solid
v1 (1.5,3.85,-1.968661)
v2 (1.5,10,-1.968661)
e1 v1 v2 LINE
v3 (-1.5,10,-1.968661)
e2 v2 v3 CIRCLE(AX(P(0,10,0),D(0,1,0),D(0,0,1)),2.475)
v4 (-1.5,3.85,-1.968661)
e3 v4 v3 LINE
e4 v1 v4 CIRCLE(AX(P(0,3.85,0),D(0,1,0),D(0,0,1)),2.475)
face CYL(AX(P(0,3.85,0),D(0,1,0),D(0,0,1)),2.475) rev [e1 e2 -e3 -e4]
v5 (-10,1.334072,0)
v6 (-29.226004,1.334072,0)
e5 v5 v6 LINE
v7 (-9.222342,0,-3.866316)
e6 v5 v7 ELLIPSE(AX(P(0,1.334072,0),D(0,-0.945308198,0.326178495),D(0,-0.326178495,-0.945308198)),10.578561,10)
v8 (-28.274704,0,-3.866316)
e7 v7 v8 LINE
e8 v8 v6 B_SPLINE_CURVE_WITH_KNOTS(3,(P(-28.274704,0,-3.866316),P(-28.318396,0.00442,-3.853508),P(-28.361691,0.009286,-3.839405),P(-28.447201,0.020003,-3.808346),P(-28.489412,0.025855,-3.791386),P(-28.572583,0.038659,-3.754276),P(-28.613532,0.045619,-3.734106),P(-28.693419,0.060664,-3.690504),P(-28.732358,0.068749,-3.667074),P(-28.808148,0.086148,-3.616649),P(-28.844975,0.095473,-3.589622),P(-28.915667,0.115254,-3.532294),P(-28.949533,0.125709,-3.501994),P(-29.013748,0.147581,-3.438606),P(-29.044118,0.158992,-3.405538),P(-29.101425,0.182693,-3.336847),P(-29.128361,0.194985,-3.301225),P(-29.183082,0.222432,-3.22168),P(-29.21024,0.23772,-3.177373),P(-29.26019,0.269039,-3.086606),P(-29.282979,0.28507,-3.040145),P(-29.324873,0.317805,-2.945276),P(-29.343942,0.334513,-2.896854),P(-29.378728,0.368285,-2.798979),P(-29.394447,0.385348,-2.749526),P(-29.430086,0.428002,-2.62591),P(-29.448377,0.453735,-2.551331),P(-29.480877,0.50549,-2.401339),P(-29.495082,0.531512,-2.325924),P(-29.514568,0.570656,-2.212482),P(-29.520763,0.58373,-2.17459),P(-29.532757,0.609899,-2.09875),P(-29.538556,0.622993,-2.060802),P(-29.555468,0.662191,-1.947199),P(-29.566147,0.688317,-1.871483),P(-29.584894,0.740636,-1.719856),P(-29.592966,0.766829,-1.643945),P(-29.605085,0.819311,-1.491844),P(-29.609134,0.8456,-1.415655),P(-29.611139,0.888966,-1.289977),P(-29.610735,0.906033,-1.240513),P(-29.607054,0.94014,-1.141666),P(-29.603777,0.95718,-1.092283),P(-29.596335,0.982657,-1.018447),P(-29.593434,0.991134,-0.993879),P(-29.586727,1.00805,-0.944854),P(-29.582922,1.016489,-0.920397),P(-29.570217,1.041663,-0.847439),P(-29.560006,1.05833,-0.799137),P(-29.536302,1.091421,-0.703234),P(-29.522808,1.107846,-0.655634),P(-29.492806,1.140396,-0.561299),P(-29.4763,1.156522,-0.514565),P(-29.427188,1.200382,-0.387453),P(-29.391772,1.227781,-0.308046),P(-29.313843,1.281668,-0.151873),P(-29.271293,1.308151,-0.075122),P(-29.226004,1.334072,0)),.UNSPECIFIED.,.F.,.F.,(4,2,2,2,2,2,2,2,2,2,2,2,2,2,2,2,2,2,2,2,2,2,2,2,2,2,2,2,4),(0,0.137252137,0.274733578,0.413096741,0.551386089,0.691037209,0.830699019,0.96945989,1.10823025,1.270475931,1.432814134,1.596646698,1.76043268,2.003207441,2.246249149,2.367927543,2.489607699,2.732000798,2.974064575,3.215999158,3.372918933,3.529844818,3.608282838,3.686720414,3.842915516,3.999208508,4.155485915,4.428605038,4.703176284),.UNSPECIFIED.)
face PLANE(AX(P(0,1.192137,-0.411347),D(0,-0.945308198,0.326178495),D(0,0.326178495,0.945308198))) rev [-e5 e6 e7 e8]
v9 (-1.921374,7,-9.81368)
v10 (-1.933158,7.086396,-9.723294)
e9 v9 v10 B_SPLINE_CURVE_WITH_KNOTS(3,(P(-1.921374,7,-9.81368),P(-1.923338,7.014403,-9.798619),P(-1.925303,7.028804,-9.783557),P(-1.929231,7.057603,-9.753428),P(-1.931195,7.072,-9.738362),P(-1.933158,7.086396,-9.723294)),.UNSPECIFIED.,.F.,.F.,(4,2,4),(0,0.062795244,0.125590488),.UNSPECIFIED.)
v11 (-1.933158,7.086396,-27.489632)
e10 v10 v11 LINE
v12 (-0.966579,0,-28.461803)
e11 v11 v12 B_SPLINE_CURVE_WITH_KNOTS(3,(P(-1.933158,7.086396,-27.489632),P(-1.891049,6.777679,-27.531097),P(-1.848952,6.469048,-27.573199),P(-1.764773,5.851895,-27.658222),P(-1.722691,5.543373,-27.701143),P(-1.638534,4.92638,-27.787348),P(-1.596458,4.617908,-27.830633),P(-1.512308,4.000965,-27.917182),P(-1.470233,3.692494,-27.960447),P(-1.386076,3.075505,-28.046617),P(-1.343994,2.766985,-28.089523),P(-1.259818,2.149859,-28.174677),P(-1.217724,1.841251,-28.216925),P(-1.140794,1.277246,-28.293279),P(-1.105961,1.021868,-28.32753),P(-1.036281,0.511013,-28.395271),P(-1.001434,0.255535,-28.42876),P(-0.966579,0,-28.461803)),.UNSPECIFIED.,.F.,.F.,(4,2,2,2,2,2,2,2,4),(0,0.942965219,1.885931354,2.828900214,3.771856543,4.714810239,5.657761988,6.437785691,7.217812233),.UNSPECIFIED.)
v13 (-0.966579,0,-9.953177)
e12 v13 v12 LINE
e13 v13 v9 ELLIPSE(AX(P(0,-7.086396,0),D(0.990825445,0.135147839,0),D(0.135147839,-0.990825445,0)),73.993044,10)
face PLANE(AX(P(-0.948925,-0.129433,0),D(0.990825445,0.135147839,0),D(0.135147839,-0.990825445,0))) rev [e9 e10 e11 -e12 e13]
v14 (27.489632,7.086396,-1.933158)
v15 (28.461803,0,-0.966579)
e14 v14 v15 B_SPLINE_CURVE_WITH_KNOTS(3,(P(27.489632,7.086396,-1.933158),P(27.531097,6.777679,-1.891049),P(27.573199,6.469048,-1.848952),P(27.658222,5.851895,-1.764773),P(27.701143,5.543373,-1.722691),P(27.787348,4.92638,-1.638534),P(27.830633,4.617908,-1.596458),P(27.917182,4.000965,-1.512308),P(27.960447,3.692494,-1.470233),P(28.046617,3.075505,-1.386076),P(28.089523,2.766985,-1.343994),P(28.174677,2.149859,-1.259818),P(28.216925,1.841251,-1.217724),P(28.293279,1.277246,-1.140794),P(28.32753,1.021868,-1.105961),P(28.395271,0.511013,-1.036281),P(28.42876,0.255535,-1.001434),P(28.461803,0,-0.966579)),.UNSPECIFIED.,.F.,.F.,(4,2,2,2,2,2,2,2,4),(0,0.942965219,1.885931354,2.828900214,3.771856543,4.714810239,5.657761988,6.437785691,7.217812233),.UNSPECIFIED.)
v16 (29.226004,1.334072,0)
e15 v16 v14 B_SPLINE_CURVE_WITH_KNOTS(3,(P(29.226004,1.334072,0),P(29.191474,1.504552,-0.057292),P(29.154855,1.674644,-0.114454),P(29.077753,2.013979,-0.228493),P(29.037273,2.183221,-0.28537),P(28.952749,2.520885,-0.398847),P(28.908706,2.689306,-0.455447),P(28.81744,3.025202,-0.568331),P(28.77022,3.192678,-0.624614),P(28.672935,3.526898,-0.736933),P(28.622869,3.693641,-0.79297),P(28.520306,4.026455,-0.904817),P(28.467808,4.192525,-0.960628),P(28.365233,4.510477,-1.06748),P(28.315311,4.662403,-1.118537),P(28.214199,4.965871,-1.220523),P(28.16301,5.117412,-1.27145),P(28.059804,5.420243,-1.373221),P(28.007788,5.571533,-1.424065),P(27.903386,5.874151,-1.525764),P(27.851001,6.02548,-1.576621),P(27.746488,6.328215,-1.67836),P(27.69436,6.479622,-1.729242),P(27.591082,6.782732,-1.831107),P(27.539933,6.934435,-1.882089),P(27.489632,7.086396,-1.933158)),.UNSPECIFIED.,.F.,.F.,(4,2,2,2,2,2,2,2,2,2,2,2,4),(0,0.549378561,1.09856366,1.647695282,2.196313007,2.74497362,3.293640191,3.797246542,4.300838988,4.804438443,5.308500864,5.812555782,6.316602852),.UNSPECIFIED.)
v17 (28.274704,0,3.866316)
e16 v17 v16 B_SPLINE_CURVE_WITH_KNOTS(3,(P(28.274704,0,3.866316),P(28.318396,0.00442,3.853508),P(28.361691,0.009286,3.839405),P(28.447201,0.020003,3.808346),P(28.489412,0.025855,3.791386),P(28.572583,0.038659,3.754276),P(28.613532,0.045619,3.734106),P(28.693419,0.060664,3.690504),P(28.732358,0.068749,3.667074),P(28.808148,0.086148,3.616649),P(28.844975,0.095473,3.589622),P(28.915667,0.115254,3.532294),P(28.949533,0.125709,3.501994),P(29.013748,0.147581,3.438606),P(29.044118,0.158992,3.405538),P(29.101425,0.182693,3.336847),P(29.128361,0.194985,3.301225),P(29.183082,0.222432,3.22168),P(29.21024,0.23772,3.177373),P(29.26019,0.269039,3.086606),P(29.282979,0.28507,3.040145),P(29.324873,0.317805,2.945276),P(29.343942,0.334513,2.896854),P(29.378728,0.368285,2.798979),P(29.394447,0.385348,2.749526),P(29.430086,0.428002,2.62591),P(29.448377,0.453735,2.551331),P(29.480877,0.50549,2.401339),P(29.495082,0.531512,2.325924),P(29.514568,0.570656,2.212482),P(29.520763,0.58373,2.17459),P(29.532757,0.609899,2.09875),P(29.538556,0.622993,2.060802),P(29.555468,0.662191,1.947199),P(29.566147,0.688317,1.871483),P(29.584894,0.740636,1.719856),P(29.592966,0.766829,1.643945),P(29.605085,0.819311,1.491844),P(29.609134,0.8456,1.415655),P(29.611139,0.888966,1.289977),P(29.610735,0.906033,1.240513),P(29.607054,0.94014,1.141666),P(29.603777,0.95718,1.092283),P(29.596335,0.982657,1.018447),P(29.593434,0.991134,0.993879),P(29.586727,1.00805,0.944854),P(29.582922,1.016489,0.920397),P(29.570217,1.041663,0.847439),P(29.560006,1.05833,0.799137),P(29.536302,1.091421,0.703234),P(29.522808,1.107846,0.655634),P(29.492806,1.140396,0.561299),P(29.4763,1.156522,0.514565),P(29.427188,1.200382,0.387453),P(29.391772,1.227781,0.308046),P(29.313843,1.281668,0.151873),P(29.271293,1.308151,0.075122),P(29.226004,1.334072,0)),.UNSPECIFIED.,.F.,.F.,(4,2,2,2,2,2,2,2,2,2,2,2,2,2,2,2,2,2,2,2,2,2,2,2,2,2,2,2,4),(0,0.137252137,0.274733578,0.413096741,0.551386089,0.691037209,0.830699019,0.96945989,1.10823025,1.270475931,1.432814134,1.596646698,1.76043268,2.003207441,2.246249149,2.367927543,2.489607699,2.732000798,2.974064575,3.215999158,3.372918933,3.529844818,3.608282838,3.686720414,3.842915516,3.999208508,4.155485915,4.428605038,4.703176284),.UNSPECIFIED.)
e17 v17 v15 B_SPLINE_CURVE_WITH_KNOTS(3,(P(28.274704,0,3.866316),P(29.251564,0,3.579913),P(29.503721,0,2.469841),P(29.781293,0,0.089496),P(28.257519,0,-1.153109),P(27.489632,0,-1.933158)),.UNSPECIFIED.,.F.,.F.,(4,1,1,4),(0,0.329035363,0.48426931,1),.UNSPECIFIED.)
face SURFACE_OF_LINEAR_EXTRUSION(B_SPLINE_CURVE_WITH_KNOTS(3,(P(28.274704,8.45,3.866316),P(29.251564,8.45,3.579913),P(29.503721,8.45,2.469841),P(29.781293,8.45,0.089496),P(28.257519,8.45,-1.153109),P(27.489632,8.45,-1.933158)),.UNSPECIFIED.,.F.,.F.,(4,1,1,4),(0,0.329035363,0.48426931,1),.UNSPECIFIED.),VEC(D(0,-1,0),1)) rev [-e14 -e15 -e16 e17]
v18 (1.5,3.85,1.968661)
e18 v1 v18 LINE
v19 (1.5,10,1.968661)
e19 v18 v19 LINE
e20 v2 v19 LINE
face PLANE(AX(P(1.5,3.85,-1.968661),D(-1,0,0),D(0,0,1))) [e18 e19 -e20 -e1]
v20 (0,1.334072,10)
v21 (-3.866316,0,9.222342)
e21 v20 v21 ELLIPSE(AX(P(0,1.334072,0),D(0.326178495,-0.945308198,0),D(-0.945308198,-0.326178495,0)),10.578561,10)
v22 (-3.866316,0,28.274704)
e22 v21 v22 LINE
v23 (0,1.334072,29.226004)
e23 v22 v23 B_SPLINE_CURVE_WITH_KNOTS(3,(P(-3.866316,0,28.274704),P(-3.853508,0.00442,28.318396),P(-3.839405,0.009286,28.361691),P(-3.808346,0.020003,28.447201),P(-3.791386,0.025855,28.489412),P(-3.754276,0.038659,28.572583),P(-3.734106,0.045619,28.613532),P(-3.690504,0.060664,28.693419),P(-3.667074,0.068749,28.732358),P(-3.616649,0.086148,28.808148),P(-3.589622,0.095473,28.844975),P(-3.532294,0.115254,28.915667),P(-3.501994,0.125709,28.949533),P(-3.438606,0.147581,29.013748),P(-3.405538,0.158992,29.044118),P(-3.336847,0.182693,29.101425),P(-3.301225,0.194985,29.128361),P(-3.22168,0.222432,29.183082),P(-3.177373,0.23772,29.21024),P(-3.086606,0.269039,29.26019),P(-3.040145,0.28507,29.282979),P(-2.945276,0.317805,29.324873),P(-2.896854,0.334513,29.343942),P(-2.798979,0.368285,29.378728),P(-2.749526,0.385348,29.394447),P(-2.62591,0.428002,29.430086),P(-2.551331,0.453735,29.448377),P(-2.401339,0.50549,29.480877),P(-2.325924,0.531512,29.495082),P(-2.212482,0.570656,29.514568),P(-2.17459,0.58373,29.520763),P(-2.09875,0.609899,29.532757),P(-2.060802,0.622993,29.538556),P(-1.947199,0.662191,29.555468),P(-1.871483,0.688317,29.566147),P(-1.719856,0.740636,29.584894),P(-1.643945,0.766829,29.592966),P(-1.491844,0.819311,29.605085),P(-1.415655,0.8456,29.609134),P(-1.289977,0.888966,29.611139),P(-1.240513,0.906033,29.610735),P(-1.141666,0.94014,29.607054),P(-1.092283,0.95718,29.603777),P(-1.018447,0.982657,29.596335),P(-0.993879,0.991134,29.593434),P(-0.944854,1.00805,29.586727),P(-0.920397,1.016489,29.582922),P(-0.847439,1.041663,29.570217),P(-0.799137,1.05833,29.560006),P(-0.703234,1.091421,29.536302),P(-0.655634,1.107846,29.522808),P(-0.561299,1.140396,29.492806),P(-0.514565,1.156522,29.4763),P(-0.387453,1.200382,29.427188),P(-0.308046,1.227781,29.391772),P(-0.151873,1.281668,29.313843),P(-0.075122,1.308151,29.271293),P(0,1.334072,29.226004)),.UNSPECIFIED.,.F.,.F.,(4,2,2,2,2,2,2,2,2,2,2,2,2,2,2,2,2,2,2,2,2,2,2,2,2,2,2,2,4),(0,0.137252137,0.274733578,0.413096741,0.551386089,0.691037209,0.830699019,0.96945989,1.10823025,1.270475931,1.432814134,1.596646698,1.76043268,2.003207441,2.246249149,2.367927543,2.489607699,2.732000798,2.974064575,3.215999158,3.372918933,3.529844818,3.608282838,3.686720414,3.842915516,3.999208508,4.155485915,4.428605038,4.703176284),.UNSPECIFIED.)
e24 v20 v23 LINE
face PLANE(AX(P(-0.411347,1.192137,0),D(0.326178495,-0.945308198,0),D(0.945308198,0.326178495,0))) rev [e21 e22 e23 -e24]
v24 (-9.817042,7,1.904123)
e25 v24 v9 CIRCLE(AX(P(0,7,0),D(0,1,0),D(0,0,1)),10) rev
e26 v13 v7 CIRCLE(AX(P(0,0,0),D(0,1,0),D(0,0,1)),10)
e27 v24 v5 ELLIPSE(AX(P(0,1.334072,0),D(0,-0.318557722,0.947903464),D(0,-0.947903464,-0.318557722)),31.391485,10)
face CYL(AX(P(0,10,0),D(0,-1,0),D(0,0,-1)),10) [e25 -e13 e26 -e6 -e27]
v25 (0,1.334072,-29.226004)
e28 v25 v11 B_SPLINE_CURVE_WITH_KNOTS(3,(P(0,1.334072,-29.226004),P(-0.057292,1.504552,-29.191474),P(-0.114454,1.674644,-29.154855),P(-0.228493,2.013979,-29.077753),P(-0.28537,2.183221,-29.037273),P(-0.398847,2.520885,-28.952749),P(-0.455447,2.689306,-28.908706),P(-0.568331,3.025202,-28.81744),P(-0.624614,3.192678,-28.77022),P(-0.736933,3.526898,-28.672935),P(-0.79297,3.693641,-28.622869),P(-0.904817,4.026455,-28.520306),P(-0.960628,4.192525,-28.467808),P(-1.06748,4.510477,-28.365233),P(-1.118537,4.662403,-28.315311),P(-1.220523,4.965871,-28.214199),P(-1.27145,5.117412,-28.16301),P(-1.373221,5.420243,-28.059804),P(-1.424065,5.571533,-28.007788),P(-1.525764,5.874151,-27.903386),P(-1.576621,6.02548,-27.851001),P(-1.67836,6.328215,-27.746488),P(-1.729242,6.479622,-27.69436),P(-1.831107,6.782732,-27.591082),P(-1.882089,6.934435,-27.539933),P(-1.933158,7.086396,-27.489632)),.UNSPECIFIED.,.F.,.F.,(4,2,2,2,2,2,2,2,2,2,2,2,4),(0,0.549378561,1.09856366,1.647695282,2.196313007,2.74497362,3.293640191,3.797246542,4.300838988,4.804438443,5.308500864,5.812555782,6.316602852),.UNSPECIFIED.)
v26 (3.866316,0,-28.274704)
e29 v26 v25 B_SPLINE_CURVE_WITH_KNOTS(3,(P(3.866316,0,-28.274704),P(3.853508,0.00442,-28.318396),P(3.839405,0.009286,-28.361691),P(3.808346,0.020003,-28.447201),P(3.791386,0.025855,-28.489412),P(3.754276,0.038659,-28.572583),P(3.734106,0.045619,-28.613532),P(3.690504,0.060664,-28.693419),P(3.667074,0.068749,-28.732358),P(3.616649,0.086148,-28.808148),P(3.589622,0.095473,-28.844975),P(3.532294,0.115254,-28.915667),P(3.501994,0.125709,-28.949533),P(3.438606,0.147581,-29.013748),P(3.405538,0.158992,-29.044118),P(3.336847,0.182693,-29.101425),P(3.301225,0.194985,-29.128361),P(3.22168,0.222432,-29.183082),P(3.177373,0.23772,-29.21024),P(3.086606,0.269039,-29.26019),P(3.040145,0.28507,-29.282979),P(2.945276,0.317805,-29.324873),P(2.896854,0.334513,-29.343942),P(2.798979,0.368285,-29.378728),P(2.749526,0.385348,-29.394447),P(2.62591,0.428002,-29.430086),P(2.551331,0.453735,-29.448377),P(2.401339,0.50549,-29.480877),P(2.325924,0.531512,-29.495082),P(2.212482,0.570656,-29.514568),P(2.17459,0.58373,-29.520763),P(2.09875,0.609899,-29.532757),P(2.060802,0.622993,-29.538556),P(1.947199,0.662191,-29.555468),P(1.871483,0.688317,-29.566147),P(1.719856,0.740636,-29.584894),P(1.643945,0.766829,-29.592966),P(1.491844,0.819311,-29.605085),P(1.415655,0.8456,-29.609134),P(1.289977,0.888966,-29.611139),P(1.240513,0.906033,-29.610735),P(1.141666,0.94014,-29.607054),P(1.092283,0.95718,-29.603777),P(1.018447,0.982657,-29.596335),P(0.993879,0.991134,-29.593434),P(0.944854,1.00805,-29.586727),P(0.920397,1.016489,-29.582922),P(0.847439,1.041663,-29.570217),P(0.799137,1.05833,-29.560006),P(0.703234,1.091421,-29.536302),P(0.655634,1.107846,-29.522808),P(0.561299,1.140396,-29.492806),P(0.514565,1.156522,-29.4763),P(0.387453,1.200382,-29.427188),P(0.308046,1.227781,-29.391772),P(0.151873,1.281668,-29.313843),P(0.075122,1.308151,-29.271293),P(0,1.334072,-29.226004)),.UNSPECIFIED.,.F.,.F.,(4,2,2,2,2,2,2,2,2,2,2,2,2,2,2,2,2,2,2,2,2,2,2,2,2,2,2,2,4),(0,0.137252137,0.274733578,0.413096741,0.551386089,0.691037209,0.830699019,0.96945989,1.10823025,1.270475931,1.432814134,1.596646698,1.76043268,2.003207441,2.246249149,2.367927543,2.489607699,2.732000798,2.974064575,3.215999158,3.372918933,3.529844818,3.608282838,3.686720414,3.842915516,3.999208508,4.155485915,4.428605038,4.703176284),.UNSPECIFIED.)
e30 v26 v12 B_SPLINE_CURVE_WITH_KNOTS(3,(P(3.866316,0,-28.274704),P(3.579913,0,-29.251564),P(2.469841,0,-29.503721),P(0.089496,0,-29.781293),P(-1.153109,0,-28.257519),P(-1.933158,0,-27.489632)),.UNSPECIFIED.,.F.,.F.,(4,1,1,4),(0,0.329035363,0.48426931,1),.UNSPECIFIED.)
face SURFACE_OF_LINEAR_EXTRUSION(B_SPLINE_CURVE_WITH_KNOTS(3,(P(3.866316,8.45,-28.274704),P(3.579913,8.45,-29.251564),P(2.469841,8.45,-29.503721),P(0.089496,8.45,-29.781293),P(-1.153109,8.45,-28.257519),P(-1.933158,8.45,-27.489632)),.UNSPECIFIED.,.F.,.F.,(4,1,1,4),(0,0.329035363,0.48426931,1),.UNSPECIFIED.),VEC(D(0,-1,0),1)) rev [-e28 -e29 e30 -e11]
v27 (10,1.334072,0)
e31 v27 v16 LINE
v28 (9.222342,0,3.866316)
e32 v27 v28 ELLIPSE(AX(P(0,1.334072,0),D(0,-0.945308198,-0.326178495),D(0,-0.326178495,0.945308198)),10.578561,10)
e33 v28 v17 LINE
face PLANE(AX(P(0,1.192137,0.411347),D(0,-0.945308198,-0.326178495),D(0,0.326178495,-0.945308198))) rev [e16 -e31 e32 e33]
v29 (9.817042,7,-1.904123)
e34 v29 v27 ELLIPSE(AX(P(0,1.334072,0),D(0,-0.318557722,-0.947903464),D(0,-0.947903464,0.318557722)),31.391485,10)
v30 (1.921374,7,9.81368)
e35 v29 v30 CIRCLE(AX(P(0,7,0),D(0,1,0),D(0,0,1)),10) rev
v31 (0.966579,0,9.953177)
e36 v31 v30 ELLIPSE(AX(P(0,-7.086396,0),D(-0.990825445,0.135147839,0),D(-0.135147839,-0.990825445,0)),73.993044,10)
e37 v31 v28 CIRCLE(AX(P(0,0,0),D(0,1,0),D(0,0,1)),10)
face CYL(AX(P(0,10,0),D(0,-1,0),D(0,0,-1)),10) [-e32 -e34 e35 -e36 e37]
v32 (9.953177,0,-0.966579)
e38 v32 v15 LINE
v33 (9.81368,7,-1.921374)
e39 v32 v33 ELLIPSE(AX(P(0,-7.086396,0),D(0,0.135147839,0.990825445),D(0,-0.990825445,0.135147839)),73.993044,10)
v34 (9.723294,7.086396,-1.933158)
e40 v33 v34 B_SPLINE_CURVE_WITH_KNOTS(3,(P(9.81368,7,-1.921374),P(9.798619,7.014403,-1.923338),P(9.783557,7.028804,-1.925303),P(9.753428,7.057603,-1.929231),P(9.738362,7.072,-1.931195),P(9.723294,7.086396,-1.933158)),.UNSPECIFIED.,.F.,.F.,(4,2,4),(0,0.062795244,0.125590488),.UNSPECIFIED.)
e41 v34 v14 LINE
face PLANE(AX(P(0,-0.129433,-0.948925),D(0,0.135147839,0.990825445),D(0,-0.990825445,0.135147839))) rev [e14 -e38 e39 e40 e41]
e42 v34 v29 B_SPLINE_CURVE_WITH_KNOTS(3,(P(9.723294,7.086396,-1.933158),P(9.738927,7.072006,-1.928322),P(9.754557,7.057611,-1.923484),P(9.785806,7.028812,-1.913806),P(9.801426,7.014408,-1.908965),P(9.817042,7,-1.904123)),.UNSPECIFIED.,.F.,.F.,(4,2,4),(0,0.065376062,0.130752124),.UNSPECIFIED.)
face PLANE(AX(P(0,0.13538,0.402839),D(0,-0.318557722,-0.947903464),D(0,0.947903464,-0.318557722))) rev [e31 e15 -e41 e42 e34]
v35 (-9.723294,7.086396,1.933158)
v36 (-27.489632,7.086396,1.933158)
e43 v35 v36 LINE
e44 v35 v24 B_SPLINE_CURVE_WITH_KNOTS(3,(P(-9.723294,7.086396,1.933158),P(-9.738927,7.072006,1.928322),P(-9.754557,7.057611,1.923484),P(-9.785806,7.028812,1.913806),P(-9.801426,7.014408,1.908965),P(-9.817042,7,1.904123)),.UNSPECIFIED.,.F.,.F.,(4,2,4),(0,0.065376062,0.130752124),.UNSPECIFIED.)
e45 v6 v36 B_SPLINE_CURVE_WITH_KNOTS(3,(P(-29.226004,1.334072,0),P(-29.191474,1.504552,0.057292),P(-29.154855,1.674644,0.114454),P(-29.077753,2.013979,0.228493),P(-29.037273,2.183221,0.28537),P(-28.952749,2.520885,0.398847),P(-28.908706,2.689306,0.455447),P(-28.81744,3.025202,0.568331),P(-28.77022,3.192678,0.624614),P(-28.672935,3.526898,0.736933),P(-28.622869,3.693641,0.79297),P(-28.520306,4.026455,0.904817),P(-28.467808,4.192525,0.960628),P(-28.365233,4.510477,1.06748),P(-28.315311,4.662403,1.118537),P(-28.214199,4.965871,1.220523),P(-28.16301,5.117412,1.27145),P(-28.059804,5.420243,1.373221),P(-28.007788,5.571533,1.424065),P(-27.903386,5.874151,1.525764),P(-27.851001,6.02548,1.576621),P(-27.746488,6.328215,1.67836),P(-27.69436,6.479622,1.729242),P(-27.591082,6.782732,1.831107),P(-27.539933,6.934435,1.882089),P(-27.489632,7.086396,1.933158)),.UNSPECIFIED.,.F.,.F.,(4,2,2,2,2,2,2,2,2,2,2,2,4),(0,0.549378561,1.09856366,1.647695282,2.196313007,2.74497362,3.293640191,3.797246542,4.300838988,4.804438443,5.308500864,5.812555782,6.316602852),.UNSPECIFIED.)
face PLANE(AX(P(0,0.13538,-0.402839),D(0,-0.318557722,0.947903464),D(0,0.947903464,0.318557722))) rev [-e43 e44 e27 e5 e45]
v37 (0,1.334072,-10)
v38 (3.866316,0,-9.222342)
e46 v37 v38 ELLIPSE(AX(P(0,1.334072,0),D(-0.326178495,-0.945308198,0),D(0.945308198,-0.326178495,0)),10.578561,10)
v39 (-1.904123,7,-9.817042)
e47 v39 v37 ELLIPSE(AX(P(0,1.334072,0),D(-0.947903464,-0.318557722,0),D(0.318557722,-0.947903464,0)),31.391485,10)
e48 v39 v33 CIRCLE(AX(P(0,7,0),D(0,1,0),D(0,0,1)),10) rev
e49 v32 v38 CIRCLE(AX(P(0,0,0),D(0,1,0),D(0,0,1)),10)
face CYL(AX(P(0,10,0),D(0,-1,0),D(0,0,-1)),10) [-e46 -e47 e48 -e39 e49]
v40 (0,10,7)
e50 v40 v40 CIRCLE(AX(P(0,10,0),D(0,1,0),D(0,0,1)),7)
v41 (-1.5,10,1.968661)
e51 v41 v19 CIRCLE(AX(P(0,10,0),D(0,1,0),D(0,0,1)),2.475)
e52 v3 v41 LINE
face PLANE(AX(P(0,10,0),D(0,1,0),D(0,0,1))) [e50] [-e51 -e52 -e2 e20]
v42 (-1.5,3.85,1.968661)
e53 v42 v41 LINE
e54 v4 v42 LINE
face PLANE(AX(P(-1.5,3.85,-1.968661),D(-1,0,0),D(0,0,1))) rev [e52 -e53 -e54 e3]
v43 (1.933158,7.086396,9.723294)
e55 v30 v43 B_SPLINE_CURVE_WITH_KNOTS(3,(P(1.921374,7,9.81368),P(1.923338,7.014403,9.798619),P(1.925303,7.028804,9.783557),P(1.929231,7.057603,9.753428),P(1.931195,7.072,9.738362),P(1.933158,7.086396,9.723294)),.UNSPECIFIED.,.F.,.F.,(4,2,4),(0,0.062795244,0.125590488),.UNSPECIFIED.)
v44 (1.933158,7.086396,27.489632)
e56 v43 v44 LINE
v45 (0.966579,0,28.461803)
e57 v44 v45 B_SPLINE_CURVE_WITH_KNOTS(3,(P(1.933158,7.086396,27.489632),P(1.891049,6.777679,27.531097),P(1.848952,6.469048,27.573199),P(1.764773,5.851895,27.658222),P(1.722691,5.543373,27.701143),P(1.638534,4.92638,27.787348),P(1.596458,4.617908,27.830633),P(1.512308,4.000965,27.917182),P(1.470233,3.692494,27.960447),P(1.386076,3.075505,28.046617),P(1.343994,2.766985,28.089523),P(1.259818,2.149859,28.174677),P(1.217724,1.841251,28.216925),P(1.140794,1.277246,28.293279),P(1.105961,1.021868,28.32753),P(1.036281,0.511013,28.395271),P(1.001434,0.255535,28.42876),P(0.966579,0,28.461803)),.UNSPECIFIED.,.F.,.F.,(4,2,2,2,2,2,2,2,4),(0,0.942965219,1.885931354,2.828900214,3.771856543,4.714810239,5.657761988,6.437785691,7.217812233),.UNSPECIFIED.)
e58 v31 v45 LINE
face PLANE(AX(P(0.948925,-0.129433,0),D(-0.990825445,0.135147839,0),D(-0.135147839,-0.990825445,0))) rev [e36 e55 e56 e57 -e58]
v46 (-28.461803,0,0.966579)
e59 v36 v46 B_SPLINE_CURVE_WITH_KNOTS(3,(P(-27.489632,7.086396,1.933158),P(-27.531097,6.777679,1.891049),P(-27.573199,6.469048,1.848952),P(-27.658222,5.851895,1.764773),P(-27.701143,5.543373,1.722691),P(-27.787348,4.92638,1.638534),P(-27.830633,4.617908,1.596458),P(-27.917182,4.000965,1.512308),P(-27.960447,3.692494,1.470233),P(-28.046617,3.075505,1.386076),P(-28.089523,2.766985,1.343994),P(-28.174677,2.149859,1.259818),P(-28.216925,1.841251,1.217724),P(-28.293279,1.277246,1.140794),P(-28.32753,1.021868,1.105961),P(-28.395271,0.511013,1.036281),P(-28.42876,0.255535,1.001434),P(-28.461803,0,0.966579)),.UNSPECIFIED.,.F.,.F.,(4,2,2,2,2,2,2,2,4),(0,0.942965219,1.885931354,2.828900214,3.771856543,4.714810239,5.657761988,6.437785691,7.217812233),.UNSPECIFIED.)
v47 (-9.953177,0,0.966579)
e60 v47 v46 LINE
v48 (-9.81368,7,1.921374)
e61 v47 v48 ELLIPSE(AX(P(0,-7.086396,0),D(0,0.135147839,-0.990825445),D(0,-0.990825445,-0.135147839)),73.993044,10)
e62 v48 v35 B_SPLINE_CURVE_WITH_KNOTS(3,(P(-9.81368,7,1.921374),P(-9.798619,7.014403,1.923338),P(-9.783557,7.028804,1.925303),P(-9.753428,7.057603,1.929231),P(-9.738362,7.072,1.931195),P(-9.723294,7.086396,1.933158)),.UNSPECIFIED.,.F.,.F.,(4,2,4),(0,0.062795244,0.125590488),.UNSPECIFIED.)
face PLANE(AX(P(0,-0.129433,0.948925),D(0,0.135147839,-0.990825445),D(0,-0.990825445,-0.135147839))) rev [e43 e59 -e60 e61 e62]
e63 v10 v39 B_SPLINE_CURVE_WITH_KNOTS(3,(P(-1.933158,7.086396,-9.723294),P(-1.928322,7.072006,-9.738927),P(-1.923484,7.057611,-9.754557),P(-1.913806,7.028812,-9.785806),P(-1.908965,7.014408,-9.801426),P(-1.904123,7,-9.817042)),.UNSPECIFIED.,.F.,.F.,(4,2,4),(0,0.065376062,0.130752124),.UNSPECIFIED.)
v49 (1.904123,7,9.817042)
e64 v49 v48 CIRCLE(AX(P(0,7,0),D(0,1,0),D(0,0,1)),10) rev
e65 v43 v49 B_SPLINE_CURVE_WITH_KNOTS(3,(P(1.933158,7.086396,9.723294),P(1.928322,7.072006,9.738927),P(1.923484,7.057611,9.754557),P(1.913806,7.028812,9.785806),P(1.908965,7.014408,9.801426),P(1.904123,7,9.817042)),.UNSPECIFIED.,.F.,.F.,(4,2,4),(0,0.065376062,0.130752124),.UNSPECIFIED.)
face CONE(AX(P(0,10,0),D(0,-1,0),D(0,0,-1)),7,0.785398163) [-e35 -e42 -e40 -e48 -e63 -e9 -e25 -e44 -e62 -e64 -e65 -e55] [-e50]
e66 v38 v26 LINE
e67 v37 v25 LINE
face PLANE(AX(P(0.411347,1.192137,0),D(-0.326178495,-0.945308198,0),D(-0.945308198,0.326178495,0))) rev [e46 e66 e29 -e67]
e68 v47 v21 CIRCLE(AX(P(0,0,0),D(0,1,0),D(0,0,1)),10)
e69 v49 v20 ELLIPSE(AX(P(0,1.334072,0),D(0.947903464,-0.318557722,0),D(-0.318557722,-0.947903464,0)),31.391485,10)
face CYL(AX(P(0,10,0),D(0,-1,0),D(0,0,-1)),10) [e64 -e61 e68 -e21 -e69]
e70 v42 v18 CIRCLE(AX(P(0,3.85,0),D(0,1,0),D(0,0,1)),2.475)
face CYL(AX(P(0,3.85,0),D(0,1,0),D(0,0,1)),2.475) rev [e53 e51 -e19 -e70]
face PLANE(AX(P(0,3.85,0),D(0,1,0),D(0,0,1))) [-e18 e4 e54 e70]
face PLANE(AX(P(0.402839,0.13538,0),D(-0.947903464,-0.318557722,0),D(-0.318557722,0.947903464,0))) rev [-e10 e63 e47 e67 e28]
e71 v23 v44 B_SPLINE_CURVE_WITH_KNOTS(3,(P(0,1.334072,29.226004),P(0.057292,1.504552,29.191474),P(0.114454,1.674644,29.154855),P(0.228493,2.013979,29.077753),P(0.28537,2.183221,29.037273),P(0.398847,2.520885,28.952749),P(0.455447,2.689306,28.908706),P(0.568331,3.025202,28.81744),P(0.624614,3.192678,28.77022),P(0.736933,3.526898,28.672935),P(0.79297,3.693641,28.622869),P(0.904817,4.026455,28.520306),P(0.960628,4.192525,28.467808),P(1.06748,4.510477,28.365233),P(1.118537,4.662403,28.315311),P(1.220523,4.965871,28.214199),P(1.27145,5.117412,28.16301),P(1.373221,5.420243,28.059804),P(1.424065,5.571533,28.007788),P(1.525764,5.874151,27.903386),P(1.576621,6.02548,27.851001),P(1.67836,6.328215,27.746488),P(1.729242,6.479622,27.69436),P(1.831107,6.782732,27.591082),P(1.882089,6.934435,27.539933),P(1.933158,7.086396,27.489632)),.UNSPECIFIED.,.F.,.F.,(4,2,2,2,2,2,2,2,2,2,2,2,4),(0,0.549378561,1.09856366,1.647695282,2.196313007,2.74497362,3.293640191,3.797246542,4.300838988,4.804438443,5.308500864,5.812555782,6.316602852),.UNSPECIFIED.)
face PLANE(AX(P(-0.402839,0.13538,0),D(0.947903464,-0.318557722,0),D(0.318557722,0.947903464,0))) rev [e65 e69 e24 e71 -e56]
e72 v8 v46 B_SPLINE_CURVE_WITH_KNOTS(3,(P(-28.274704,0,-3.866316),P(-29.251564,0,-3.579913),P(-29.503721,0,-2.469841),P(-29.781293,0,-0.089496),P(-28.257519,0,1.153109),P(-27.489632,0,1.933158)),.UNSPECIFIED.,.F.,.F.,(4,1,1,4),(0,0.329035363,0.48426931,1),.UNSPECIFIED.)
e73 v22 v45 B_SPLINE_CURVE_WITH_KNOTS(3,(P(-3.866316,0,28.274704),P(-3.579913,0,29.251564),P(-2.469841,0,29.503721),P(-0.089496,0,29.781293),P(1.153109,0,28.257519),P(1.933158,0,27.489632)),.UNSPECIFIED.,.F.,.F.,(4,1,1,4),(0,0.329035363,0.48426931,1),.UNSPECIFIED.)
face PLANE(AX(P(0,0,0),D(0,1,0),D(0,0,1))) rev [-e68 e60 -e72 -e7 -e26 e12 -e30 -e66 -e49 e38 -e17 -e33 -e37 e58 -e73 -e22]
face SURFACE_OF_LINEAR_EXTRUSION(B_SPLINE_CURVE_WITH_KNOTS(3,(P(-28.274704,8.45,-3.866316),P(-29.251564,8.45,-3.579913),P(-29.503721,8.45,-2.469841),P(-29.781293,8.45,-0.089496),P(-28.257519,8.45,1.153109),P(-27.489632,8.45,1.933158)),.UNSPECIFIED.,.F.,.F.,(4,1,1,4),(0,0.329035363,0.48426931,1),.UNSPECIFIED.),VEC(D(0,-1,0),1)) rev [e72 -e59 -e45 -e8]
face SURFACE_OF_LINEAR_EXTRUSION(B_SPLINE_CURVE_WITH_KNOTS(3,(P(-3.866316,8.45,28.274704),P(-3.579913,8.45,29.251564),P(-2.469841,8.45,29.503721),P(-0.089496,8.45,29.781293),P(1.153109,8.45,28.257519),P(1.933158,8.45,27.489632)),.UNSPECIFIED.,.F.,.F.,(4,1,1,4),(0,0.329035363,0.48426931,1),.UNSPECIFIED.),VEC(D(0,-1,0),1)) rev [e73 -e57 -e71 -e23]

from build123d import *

# Parameters (mm, degrees)
SKETCH1_R           = 10
BOSS_EXTRUDE2_DEPTH = 10
CIRPATTERN1_COUNT   = 4
CUT_EXTRUDE3_DEPTH  = 6.15
CUT_EXTRUDE4_DEPTH  = 8.45
CIRPATTERN2_COUNT   = 4
CHAMFER1_SIZE       = 3


with BuildPart() as part:
    # Sketch1 → Boss-Extrude2 (new body)
    with BuildSketch(Plane(origin=(0, 0, 0), x_dir=(1, 0, 0), z_dir=(0, 1, 0))):
        with Locations(Location((0, 0, 0), (0, 0, 270))):
            Circle(SKETCH1_R)
    extrude(amount=BOSS_EXTRUDE2_DEPTH)

    # Sketch2 → Loft1 section 0
    with BuildSketch(Plane.XY.offset(8)):
        with BuildLine():
            Line((0, 1.334072036), (1.933158154, 7.086396301))
            Line((1.933158154, 7.086396301), (0.966579077, 0))
            Line((0.966579077, 0), (-3.866316309, 0))
            Line((-3.866316309, 0), (0, 1.334072036))
        make_face()
    # Sketch3 → Loft1 section 1
    with BuildSketch(Plane.XY.offset(30)):
        with BuildLine():
            Line((0, 1.334072036), (1.933158154, 7.086396301))
            Line((1.933158154, 7.086396301), (0.966579077, 0))
            Line((0.966579077, 0), (-3.866316309, 0))
            Line((-3.866316309, 0), (0, 1.334072036))
        make_face()
    loft1 = loft()

    # CirPattern1: Loft1 ×4 about axis
    cirpattern1_axis = Axis((0, 0, 0), (0, 1, 0))
    for i in range(1, CIRPATTERN1_COUNT):
        add(loft1.rotate(cirpattern1_axis, i * 360 / CIRPATTERN1_COUNT))

    # Sketch8 → Cut-Extrude3 (cut)
    with BuildSketch(Plane(origin=(0, 10, 0), x_dir=(1, 0, 0), z_dir=(0, 1, 0))):
        with BuildLine():
            Line((1.5, 1.968660712), (1.5, -1.968660712))
            ThreePointArc((1.5, -1.968660712), (0, -2.475), (-1.5, -1.968660712))
            Line((-1.5, -1.968660712), (-1.5, 1.968660712))
            ThreePointArc((-1.5, 1.968660712), (0, 2.475), (1.5, 1.968660712))
        make_face()
    extrude(amount=-CUT_EXTRUDE3_DEPTH, mode=Mode.SUBTRACT)

    # Sketch9 → Cut-Extrude4 (cut)
    with BuildSketch(Plane.XZ):
        with BuildLine():
            Line((28.274704093, 3.866316309), (30.023429762, 3.866316309))
            Line((30.023429762, 3.866316309), (30.023429762, -1.933158154))
            Line((30.023429762, -1.933158154), (27.489632408, -1.933158154))
            add(Edge.make_bspline(
                [(28.274704093, 3.866316309), (29.251563836, 3.579912726), (29.503721472, 2.469841159), (29.781293332, 0.089495711), (28.257519324, -1.153109295), (27.489632408, -1.933158154)],
                knots=[0, 0, 0, 0, 0.329035363, 0.48426931, 1, 1, 1, 1], degree=3))
        make_face()
    cut_extrude4 = extrude(amount=-CUT_EXTRUDE4_DEPTH, mode=Mode.SUBTRACT)

    # CirPattern2: Cut-Extrude4 ×4 about axis
    cirpattern2_axis = Axis((0, 10, 0), (0, 1, 0))
    for i in range(1, CIRPATTERN2_COUNT):
        add(cut_extrude4.rotate(cirpattern2_axis, i * 360 / CIRPATTERN2_COUNT), mode=Mode.SUBTRACT)

    # Chamfer1
    # the kernel refuses this chamfer: 3 mm, written as the material it takes off along each edge
    with BuildSketch(Plane(origin=(0, 10, 0), x_dir=(0, 0, 1), z_dir=(-1, 0, 0))) as chamfer1_piece_1_section:
        Polygon((10, -CHAMFER1_SIZE), (10 - CHAMFER1_SIZE, 0), (10, 0), align=None)
    chamfer1_piece_1 = revolve(axis=Axis((0, 10, 0), (0, 1, 0)), mode=Mode.PRIVATE)
    chamfer1_piece_1 = split(chamfer1_piece_1, bisect_by=Plane(origin=(2.324578556, 8.251110666, 8.890331171), z_dir=(-0.947903464475993, 0.3185577216681616, 0)), keep=Keep.TOP, mode=Mode.PRIVATE)
    chamfer1_piece_1 = split(chamfer1_piece_1, bisect_by=Plane(origin=(-2.324578556, 8.251110666, 8.890331171), z_dir=(0.947903464475993, 0.3185577216681616, 0)), keep=Keep.TOP, mode=Mode.PRIVATE)
    add(chamfer1_piece_1, mode=Mode.SUBTRACT)
    with BuildSketch(Plane(origin=(0, 10, 0), x_dir=(0, 0, 1), z_dir=(-1, 0, 0))) as chamfer1_piece_2_section:
        Polygon((10, -CHAMFER1_SIZE), (10 - CHAMFER1_SIZE, 0), (10, 0), align=None)
    chamfer1_piece_2 = revolve(axis=Axis((0, 10, 0), (0, 1, 0)), mode=Mode.PRIVATE)
    chamfer1_piece_2 = split(chamfer1_piece_2, bisect_by=Plane(origin=(-1.927187537, 7.042623199, 9.791355143), z_dir=(0.9908254446191594, 0.13514783866287053, 0)), keep=Keep.TOP, mode=Mode.PRIVATE)
    chamfer1_piece_2 = split(chamfer1_piece_2, bisect_by=Plane(origin=(-1.922954088, 3.507226982, -0.730322564), z_dir=(0, 0.3185577216681616, 0.947903464475993)), keep=Keep.TOP, mode=Mode.PRIVATE)
    chamfer1_piece_2 = split(chamfer1_piece_2, bisect_by=Plane(origin=(-1.919079209, 7.044502852, 9.791355143), z_dir=(-0.947903464475993, -0.3185577216681616, 0)), keep=Keep.TOP, mode=Mode.PRIVATE)
    add(chamfer1_piece_2, mode=Mode.SUBTRACT)
    with BuildSketch(Plane(origin=(0, 10, 0), x_dir=(0, 0, 1), z_dir=(-1, 0, 0))) as chamfer1_piece_3_section:
        Polygon((10, -CHAMFER1_SIZE), (10 - CHAMFER1_SIZE, 0), (10, 0), align=None)
    chamfer1_piece_3 = revolve(axis=Axis((0, 10, 0), (0, 1, 0)), mode=Mode.PRIVATE)
    chamfer1_piece_3 = split(chamfer1_piece_3, bisect_by=Plane(origin=(2.255597721, 9.450335897, 6.172482093), z_dir=(0.9908254446191594, -0.13514783866287053, 0)), keep=Keep.TOP, mode=Mode.PRIVATE)
    chamfer1_piece_3 = split(chamfer1_piece_3, bisect_by=Plane(origin=(6.172482093, 6.28280667, -1.663099344), z_dir=(0, 0.3185577216681616, 0.947903464475993)), keep=Keep.TOP, mode=Mode.PRIVATE)
    add(chamfer1_piece_3, mode=Mode.SUBTRACT)
    with BuildSketch(Plane(origin=(0, 10, 0), x_dir=(0, 0, 1), z_dir=(-1, 0, 0))) as chamfer1_piece_4_section:
        Polygon((10, -CHAMFER1_SIZE), (10 - CHAMFER1_SIZE, 0), (10, 0), align=None)
    chamfer1_piece_4 = revolve(axis=Axis((0, 10, 0), (0, 1, 0)), mode=Mode.PRIVATE)
    chamfer1_piece_4 = split(chamfer1_piece_4, bisect_by=Plane(origin=(-6.172482093, 9.450335897, 2.255597721), z_dir=(0, -0.13514783866287053, 0.9908254446191594)), keep=Keep.TOP, mode=Mode.PRIVATE)
    chamfer1_piece_4 = split(chamfer1_piece_4, bisect_by=Plane(origin=(-2.915854237, 10.010516351, 6.172482093), z_dir=(-0.947903464475993, -0.3185577216681616, 0)), keep=Keep.TOP, mode=Mode.PRIVATE)
    add(chamfer1_piece_4, mode=Mode.SUBTRACT)
    with BuildSketch(Plane(origin=(0, 10, 0), x_dir=(0, 0, 1), z_dir=(-1, 0, 0))) as chamfer1_piece_5_section:
        Polygon((10, -CHAMFER1_SIZE), (10 - CHAMFER1_SIZE, 0), (10, 0), align=None)
    chamfer1_piece_5 = revolve(axis=Axis((0, 10, 0), (0, 1, 0)), mode=Mode.PRIVATE)
    chamfer1_piece_5 = split(chamfer1_piece_5, bisect_by=Plane(origin=(-2.32080528, 9.928399838, 0), z_dir=(-0.9908254446191594, -0.13514783866287053, 0)), keep=Keep.TOP, mode=Mode.PRIVATE)
    chamfer1_piece_5 = split(chamfer1_piece_5, bisect_by=Plane(origin=(-8.890331171, 8.251110666, 2.324578556), z_dir=(0, 0.3185577216681616, -0.947903464475993)), keep=Keep.TOP, mode=Mode.PRIVATE)
    add(chamfer1_piece_5, mode=Mode.SUBTRACT)
    with BuildSketch(Plane(origin=(0, 10, 0), x_dir=(0, 0, 1), z_dir=(-1, 0, 0))) as chamfer1_piece_6_section:
        Polygon((10, -CHAMFER1_SIZE), (10 - CHAMFER1_SIZE, 0), (10, 0), align=None)
    chamfer1_piece_6 = revolve(axis=Axis((0, 10, 0), (0, 1, 0)), mode=Mode.PRIVATE)
    chamfer1_piece_6 = split(chamfer1_piece_6, bisect_by=Plane(origin=(6.172482093, 9.450335897, -2.255597721), z_dir=(0, -0.13514783866287053, -0.9908254446191594)), keep=Keep.TOP, mode=Mode.PRIVATE)
    chamfer1_piece_6 = split(chamfer1_piece_6, bisect_by=Plane(origin=(-1.663099344, 6.28280667, -6.172482093), z_dir=(0.947903464475993, 0.3185577216681616, 0)), keep=Keep.TOP, mode=Mode.PRIVATE)
    add(chamfer1_piece_6, mode=Mode.SUBTRACT)


solid = part.part
